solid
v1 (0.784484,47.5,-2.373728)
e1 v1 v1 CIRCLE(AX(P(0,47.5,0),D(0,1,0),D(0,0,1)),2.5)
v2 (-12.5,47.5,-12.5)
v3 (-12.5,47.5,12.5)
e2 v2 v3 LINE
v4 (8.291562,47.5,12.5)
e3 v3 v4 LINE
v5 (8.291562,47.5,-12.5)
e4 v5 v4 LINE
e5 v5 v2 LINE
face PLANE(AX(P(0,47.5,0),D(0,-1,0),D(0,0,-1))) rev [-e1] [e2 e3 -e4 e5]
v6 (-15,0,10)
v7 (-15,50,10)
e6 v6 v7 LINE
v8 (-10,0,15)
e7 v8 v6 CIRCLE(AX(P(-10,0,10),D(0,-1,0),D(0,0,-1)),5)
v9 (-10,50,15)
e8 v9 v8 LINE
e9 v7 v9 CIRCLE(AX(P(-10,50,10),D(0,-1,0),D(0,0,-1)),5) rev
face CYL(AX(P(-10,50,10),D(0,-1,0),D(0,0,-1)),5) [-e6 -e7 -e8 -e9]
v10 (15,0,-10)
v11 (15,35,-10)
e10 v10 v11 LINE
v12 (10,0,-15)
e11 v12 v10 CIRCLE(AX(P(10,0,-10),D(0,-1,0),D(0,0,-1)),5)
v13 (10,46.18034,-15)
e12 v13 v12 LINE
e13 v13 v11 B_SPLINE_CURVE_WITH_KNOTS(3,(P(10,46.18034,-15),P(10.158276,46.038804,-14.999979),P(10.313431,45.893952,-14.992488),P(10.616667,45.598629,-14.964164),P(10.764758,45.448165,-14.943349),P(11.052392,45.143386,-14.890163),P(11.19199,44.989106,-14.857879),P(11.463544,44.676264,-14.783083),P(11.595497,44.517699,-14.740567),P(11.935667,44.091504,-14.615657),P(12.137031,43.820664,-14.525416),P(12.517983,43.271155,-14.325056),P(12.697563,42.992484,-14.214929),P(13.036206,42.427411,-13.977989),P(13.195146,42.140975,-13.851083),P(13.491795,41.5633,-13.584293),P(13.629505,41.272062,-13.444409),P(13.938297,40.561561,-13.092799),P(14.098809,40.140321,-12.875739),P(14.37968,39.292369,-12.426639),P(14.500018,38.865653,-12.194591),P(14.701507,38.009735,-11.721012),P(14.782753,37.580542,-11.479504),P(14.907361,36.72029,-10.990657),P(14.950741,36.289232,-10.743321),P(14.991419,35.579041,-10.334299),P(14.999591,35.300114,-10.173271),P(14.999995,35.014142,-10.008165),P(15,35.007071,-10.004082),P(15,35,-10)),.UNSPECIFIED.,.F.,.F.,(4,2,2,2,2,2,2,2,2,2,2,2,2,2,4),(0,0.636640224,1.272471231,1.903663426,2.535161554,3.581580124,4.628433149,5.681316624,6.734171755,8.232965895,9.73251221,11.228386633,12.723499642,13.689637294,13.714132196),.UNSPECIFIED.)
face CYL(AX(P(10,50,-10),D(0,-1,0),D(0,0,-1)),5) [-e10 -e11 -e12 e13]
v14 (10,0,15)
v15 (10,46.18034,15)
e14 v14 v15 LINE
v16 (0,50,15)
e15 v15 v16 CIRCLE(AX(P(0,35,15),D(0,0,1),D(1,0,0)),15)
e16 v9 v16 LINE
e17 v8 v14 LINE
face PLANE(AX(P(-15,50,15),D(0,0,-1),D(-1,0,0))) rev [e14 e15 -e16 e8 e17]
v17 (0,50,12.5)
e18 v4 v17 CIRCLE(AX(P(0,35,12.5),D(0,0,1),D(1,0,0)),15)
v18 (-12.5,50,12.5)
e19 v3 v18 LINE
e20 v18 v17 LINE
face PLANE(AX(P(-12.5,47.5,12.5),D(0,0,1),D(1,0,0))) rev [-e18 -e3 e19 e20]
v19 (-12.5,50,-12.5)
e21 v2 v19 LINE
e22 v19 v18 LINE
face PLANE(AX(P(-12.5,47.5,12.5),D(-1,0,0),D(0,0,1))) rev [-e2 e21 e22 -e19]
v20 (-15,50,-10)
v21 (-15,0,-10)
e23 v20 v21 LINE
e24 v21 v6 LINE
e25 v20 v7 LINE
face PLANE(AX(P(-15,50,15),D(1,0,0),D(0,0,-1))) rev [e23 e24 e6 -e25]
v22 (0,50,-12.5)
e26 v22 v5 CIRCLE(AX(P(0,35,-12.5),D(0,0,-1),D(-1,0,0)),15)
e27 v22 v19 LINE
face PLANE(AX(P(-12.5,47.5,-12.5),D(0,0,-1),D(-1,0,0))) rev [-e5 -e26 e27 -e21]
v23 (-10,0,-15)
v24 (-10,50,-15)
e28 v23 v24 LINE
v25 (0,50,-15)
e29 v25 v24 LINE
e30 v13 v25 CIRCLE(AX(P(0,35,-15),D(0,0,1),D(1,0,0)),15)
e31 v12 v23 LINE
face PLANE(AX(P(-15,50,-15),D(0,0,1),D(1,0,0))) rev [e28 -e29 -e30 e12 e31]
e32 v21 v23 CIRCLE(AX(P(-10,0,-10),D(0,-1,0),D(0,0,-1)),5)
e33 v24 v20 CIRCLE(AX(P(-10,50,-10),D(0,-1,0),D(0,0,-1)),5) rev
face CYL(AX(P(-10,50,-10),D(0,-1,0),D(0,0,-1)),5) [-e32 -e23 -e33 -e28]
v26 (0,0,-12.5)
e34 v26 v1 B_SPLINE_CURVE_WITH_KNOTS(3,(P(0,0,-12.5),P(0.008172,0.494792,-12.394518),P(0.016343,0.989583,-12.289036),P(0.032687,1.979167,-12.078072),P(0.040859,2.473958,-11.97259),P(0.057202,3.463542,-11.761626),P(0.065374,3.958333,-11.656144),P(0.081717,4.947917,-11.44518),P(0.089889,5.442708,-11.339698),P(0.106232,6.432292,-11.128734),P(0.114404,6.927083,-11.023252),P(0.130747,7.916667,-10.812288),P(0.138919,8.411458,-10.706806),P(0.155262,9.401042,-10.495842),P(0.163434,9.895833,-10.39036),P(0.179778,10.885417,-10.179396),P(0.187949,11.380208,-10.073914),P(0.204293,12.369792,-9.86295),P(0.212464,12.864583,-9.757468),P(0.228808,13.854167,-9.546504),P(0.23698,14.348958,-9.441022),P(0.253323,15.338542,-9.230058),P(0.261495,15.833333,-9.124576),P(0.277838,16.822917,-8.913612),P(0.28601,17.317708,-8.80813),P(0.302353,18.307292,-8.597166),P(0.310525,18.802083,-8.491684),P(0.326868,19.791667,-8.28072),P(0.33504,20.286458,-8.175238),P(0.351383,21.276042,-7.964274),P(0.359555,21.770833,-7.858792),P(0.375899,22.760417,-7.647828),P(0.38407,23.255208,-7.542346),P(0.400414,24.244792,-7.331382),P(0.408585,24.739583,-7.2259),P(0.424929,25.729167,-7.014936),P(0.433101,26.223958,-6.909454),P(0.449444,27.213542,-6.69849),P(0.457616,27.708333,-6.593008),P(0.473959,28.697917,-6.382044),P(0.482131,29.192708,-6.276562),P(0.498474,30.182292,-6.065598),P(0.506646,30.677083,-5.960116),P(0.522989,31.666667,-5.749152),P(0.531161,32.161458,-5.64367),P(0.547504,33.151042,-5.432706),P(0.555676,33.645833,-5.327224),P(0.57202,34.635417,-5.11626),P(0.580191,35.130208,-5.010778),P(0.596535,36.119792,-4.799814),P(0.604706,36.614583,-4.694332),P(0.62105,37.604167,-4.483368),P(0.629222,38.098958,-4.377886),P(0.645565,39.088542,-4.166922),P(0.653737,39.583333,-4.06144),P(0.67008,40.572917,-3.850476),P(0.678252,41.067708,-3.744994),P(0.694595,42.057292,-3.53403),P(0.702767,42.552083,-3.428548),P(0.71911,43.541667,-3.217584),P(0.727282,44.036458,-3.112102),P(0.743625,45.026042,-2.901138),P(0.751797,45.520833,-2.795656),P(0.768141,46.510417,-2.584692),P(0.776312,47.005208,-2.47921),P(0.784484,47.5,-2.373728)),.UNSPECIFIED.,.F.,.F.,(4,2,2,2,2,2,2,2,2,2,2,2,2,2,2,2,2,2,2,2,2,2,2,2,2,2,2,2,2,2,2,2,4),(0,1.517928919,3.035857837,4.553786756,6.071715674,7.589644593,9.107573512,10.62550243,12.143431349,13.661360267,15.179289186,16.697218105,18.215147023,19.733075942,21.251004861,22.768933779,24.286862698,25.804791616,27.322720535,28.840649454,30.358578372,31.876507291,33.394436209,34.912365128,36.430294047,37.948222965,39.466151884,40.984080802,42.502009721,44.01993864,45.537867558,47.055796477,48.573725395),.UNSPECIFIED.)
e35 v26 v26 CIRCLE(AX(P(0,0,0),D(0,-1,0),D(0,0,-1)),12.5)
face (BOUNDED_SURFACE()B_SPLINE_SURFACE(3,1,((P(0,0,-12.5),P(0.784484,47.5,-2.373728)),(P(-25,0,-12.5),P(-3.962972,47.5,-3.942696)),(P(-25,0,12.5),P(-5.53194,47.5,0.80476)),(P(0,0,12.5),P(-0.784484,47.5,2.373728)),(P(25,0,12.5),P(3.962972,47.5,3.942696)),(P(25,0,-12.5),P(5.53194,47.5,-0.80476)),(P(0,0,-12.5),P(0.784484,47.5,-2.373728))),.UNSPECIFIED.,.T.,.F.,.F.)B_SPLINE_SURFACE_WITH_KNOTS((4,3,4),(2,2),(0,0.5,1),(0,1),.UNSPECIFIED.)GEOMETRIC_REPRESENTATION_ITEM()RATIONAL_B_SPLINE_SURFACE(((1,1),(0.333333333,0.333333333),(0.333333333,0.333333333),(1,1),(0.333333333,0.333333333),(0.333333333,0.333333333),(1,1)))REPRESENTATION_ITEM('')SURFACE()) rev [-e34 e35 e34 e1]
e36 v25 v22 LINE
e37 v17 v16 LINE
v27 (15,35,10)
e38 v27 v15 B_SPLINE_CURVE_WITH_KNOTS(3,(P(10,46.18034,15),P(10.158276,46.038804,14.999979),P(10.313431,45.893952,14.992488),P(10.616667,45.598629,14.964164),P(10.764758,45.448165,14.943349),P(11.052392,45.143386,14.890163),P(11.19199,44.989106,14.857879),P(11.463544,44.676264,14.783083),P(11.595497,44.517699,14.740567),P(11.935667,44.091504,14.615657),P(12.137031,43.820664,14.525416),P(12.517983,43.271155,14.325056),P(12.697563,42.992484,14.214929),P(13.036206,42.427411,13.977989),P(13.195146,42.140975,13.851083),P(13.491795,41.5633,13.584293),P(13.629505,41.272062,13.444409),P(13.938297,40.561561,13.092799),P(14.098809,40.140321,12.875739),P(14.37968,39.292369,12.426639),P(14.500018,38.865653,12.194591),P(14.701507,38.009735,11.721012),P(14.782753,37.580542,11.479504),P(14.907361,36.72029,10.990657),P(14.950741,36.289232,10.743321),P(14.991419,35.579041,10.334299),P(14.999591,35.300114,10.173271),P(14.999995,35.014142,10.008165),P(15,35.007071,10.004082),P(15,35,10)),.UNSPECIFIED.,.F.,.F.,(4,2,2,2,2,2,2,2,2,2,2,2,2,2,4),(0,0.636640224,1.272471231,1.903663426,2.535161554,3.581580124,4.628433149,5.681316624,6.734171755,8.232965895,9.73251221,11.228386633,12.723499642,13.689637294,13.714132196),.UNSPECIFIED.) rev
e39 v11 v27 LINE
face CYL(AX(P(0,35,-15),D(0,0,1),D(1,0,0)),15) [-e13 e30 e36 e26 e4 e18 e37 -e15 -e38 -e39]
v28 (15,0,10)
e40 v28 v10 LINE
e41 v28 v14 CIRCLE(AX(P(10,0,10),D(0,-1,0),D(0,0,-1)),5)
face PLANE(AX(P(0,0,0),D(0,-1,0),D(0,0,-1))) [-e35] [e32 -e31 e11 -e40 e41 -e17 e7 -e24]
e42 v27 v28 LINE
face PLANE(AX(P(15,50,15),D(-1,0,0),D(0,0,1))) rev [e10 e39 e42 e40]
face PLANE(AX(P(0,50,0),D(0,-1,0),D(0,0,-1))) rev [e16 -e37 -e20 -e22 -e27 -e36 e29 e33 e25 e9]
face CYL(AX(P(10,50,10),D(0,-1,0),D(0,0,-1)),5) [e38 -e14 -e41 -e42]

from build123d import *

# Parameters (mm, degrees)
SKETCH2_W           = 30
SKETCH2_H           = 30
BOSS_EXTRUDE1_DEPTH = 50
SKETCH3_W           = 25
SKETCH3_H           = 25
CUT_EXTRUDE1_DEPTH  = 2.5
FILLET1_R           = 5
CUT_EXTRUDE2_DEPTH  = 61.207972969


with BuildPart() as part:
    # Sketch2 → Boss-Extrude1 (new body)
    with BuildSketch(Plane(origin=(0, 0, 0), x_dir=(1, 0, 0), z_dir=(0, 1, 0))):
        Rectangle(SKETCH2_W, SKETCH2_H)
    extrude(amount=BOSS_EXTRUDE1_DEPTH)

    # Sketch3 → Cut-Extrude1 (cut)
    with BuildSketch(Plane(origin=(0, 50, 0), x_dir=(1, 0, 0), z_dir=(0, 1, 0))):
        Rectangle(SKETCH3_W, SKETCH3_H)
    extrude(amount=-CUT_EXTRUDE1_DEPTH, mode=Mode.SUBTRACT)

    # Fillet1
    fillet1_edges = [part.edges().sort_by_distance(p)[0] for p in [
        (15, 25, 15),
        (-15, 25, 15),
        (-15, 25, -15),
        (15, 25, -15),
    ]]
    fillet(fillet1_edges, radius=FILLET1_R)

    # Cut-Loft2: read off the stored shape, not the designer's step
    # Cut-Loft2: loft between two sections, ruled curve by curve
    cut_loft2_from = [
        Edge.make_bspline([(0, 0, -12.5), (-25, 0, -12.5), (-25, 0, 12.5), (0, 0, 12.5), (25, 0, 12.5), (25, 0, -12.5), (0, 0, -12.5)], [0, 0, 0, 0, 0.5, 0.5, 0.5, 1, 1, 1, 1], 3, [1, 0.333333333, 0.333333333, 1, 0.333333333, 0.333333333, 1]),
    ]
    cut_loft2_to = [
        Edge.make_bspline([(0.784484005, 47.5, -2.373728048), (-3.962972092, 47.5, -3.942696057), (-5.531940101, 47.5, 0.804760039), (-0.784484005, 47.5, 2.373728048), (3.962972092, 47.5, 3.942696057), (5.531940101, 47.5, -0.804760039), (0.784484005, 47.5, -2.373728048)], [0, 0, 0, 0, 0.5, 0.5, 0.5, 1, 1, 1, 1], 3, [1, 0.333333333, 0.333333333, 1, 0.333333333, 0.333333333, 1]),
    ]
    cut_loft2 = Solid(Shell([*[Face.make_surface_from_curves(cut_loft2_from[k], cut_loft2_to[k]) for k in range(1)], Face(Wire(cut_loft2_from)), Face(Wire(cut_loft2_to))]))
    add(cut_loft2, mode=Mode.SUBTRACT)

    # Sketch9 → Cut-Extrude2 (cut, through all)
    with BuildSketch(Plane.XY.offset(15)):
        with BuildLine():
            Line((15, 50), (10, 50))
            Line((10, 50), (10, 46.180339887))
            ThreePointArc((10, 46.180339887), (13.693063938, 41.123724357), (15, 35))
            Line((15, 35), (15, 50))
        make_face()
        with BuildLine():
            Line((10, 50), (0, 50))
            ThreePointArc((0, 50), (5.352331347, 49.012585384), (10, 46.180339887))
            Line((10, 46.180339887), (10, 50))
        make_face()
    extrude(amount=-CUT_EXTRUDE2_DEPTH, mode=Mode.SUBTRACT)


solid = part.part
